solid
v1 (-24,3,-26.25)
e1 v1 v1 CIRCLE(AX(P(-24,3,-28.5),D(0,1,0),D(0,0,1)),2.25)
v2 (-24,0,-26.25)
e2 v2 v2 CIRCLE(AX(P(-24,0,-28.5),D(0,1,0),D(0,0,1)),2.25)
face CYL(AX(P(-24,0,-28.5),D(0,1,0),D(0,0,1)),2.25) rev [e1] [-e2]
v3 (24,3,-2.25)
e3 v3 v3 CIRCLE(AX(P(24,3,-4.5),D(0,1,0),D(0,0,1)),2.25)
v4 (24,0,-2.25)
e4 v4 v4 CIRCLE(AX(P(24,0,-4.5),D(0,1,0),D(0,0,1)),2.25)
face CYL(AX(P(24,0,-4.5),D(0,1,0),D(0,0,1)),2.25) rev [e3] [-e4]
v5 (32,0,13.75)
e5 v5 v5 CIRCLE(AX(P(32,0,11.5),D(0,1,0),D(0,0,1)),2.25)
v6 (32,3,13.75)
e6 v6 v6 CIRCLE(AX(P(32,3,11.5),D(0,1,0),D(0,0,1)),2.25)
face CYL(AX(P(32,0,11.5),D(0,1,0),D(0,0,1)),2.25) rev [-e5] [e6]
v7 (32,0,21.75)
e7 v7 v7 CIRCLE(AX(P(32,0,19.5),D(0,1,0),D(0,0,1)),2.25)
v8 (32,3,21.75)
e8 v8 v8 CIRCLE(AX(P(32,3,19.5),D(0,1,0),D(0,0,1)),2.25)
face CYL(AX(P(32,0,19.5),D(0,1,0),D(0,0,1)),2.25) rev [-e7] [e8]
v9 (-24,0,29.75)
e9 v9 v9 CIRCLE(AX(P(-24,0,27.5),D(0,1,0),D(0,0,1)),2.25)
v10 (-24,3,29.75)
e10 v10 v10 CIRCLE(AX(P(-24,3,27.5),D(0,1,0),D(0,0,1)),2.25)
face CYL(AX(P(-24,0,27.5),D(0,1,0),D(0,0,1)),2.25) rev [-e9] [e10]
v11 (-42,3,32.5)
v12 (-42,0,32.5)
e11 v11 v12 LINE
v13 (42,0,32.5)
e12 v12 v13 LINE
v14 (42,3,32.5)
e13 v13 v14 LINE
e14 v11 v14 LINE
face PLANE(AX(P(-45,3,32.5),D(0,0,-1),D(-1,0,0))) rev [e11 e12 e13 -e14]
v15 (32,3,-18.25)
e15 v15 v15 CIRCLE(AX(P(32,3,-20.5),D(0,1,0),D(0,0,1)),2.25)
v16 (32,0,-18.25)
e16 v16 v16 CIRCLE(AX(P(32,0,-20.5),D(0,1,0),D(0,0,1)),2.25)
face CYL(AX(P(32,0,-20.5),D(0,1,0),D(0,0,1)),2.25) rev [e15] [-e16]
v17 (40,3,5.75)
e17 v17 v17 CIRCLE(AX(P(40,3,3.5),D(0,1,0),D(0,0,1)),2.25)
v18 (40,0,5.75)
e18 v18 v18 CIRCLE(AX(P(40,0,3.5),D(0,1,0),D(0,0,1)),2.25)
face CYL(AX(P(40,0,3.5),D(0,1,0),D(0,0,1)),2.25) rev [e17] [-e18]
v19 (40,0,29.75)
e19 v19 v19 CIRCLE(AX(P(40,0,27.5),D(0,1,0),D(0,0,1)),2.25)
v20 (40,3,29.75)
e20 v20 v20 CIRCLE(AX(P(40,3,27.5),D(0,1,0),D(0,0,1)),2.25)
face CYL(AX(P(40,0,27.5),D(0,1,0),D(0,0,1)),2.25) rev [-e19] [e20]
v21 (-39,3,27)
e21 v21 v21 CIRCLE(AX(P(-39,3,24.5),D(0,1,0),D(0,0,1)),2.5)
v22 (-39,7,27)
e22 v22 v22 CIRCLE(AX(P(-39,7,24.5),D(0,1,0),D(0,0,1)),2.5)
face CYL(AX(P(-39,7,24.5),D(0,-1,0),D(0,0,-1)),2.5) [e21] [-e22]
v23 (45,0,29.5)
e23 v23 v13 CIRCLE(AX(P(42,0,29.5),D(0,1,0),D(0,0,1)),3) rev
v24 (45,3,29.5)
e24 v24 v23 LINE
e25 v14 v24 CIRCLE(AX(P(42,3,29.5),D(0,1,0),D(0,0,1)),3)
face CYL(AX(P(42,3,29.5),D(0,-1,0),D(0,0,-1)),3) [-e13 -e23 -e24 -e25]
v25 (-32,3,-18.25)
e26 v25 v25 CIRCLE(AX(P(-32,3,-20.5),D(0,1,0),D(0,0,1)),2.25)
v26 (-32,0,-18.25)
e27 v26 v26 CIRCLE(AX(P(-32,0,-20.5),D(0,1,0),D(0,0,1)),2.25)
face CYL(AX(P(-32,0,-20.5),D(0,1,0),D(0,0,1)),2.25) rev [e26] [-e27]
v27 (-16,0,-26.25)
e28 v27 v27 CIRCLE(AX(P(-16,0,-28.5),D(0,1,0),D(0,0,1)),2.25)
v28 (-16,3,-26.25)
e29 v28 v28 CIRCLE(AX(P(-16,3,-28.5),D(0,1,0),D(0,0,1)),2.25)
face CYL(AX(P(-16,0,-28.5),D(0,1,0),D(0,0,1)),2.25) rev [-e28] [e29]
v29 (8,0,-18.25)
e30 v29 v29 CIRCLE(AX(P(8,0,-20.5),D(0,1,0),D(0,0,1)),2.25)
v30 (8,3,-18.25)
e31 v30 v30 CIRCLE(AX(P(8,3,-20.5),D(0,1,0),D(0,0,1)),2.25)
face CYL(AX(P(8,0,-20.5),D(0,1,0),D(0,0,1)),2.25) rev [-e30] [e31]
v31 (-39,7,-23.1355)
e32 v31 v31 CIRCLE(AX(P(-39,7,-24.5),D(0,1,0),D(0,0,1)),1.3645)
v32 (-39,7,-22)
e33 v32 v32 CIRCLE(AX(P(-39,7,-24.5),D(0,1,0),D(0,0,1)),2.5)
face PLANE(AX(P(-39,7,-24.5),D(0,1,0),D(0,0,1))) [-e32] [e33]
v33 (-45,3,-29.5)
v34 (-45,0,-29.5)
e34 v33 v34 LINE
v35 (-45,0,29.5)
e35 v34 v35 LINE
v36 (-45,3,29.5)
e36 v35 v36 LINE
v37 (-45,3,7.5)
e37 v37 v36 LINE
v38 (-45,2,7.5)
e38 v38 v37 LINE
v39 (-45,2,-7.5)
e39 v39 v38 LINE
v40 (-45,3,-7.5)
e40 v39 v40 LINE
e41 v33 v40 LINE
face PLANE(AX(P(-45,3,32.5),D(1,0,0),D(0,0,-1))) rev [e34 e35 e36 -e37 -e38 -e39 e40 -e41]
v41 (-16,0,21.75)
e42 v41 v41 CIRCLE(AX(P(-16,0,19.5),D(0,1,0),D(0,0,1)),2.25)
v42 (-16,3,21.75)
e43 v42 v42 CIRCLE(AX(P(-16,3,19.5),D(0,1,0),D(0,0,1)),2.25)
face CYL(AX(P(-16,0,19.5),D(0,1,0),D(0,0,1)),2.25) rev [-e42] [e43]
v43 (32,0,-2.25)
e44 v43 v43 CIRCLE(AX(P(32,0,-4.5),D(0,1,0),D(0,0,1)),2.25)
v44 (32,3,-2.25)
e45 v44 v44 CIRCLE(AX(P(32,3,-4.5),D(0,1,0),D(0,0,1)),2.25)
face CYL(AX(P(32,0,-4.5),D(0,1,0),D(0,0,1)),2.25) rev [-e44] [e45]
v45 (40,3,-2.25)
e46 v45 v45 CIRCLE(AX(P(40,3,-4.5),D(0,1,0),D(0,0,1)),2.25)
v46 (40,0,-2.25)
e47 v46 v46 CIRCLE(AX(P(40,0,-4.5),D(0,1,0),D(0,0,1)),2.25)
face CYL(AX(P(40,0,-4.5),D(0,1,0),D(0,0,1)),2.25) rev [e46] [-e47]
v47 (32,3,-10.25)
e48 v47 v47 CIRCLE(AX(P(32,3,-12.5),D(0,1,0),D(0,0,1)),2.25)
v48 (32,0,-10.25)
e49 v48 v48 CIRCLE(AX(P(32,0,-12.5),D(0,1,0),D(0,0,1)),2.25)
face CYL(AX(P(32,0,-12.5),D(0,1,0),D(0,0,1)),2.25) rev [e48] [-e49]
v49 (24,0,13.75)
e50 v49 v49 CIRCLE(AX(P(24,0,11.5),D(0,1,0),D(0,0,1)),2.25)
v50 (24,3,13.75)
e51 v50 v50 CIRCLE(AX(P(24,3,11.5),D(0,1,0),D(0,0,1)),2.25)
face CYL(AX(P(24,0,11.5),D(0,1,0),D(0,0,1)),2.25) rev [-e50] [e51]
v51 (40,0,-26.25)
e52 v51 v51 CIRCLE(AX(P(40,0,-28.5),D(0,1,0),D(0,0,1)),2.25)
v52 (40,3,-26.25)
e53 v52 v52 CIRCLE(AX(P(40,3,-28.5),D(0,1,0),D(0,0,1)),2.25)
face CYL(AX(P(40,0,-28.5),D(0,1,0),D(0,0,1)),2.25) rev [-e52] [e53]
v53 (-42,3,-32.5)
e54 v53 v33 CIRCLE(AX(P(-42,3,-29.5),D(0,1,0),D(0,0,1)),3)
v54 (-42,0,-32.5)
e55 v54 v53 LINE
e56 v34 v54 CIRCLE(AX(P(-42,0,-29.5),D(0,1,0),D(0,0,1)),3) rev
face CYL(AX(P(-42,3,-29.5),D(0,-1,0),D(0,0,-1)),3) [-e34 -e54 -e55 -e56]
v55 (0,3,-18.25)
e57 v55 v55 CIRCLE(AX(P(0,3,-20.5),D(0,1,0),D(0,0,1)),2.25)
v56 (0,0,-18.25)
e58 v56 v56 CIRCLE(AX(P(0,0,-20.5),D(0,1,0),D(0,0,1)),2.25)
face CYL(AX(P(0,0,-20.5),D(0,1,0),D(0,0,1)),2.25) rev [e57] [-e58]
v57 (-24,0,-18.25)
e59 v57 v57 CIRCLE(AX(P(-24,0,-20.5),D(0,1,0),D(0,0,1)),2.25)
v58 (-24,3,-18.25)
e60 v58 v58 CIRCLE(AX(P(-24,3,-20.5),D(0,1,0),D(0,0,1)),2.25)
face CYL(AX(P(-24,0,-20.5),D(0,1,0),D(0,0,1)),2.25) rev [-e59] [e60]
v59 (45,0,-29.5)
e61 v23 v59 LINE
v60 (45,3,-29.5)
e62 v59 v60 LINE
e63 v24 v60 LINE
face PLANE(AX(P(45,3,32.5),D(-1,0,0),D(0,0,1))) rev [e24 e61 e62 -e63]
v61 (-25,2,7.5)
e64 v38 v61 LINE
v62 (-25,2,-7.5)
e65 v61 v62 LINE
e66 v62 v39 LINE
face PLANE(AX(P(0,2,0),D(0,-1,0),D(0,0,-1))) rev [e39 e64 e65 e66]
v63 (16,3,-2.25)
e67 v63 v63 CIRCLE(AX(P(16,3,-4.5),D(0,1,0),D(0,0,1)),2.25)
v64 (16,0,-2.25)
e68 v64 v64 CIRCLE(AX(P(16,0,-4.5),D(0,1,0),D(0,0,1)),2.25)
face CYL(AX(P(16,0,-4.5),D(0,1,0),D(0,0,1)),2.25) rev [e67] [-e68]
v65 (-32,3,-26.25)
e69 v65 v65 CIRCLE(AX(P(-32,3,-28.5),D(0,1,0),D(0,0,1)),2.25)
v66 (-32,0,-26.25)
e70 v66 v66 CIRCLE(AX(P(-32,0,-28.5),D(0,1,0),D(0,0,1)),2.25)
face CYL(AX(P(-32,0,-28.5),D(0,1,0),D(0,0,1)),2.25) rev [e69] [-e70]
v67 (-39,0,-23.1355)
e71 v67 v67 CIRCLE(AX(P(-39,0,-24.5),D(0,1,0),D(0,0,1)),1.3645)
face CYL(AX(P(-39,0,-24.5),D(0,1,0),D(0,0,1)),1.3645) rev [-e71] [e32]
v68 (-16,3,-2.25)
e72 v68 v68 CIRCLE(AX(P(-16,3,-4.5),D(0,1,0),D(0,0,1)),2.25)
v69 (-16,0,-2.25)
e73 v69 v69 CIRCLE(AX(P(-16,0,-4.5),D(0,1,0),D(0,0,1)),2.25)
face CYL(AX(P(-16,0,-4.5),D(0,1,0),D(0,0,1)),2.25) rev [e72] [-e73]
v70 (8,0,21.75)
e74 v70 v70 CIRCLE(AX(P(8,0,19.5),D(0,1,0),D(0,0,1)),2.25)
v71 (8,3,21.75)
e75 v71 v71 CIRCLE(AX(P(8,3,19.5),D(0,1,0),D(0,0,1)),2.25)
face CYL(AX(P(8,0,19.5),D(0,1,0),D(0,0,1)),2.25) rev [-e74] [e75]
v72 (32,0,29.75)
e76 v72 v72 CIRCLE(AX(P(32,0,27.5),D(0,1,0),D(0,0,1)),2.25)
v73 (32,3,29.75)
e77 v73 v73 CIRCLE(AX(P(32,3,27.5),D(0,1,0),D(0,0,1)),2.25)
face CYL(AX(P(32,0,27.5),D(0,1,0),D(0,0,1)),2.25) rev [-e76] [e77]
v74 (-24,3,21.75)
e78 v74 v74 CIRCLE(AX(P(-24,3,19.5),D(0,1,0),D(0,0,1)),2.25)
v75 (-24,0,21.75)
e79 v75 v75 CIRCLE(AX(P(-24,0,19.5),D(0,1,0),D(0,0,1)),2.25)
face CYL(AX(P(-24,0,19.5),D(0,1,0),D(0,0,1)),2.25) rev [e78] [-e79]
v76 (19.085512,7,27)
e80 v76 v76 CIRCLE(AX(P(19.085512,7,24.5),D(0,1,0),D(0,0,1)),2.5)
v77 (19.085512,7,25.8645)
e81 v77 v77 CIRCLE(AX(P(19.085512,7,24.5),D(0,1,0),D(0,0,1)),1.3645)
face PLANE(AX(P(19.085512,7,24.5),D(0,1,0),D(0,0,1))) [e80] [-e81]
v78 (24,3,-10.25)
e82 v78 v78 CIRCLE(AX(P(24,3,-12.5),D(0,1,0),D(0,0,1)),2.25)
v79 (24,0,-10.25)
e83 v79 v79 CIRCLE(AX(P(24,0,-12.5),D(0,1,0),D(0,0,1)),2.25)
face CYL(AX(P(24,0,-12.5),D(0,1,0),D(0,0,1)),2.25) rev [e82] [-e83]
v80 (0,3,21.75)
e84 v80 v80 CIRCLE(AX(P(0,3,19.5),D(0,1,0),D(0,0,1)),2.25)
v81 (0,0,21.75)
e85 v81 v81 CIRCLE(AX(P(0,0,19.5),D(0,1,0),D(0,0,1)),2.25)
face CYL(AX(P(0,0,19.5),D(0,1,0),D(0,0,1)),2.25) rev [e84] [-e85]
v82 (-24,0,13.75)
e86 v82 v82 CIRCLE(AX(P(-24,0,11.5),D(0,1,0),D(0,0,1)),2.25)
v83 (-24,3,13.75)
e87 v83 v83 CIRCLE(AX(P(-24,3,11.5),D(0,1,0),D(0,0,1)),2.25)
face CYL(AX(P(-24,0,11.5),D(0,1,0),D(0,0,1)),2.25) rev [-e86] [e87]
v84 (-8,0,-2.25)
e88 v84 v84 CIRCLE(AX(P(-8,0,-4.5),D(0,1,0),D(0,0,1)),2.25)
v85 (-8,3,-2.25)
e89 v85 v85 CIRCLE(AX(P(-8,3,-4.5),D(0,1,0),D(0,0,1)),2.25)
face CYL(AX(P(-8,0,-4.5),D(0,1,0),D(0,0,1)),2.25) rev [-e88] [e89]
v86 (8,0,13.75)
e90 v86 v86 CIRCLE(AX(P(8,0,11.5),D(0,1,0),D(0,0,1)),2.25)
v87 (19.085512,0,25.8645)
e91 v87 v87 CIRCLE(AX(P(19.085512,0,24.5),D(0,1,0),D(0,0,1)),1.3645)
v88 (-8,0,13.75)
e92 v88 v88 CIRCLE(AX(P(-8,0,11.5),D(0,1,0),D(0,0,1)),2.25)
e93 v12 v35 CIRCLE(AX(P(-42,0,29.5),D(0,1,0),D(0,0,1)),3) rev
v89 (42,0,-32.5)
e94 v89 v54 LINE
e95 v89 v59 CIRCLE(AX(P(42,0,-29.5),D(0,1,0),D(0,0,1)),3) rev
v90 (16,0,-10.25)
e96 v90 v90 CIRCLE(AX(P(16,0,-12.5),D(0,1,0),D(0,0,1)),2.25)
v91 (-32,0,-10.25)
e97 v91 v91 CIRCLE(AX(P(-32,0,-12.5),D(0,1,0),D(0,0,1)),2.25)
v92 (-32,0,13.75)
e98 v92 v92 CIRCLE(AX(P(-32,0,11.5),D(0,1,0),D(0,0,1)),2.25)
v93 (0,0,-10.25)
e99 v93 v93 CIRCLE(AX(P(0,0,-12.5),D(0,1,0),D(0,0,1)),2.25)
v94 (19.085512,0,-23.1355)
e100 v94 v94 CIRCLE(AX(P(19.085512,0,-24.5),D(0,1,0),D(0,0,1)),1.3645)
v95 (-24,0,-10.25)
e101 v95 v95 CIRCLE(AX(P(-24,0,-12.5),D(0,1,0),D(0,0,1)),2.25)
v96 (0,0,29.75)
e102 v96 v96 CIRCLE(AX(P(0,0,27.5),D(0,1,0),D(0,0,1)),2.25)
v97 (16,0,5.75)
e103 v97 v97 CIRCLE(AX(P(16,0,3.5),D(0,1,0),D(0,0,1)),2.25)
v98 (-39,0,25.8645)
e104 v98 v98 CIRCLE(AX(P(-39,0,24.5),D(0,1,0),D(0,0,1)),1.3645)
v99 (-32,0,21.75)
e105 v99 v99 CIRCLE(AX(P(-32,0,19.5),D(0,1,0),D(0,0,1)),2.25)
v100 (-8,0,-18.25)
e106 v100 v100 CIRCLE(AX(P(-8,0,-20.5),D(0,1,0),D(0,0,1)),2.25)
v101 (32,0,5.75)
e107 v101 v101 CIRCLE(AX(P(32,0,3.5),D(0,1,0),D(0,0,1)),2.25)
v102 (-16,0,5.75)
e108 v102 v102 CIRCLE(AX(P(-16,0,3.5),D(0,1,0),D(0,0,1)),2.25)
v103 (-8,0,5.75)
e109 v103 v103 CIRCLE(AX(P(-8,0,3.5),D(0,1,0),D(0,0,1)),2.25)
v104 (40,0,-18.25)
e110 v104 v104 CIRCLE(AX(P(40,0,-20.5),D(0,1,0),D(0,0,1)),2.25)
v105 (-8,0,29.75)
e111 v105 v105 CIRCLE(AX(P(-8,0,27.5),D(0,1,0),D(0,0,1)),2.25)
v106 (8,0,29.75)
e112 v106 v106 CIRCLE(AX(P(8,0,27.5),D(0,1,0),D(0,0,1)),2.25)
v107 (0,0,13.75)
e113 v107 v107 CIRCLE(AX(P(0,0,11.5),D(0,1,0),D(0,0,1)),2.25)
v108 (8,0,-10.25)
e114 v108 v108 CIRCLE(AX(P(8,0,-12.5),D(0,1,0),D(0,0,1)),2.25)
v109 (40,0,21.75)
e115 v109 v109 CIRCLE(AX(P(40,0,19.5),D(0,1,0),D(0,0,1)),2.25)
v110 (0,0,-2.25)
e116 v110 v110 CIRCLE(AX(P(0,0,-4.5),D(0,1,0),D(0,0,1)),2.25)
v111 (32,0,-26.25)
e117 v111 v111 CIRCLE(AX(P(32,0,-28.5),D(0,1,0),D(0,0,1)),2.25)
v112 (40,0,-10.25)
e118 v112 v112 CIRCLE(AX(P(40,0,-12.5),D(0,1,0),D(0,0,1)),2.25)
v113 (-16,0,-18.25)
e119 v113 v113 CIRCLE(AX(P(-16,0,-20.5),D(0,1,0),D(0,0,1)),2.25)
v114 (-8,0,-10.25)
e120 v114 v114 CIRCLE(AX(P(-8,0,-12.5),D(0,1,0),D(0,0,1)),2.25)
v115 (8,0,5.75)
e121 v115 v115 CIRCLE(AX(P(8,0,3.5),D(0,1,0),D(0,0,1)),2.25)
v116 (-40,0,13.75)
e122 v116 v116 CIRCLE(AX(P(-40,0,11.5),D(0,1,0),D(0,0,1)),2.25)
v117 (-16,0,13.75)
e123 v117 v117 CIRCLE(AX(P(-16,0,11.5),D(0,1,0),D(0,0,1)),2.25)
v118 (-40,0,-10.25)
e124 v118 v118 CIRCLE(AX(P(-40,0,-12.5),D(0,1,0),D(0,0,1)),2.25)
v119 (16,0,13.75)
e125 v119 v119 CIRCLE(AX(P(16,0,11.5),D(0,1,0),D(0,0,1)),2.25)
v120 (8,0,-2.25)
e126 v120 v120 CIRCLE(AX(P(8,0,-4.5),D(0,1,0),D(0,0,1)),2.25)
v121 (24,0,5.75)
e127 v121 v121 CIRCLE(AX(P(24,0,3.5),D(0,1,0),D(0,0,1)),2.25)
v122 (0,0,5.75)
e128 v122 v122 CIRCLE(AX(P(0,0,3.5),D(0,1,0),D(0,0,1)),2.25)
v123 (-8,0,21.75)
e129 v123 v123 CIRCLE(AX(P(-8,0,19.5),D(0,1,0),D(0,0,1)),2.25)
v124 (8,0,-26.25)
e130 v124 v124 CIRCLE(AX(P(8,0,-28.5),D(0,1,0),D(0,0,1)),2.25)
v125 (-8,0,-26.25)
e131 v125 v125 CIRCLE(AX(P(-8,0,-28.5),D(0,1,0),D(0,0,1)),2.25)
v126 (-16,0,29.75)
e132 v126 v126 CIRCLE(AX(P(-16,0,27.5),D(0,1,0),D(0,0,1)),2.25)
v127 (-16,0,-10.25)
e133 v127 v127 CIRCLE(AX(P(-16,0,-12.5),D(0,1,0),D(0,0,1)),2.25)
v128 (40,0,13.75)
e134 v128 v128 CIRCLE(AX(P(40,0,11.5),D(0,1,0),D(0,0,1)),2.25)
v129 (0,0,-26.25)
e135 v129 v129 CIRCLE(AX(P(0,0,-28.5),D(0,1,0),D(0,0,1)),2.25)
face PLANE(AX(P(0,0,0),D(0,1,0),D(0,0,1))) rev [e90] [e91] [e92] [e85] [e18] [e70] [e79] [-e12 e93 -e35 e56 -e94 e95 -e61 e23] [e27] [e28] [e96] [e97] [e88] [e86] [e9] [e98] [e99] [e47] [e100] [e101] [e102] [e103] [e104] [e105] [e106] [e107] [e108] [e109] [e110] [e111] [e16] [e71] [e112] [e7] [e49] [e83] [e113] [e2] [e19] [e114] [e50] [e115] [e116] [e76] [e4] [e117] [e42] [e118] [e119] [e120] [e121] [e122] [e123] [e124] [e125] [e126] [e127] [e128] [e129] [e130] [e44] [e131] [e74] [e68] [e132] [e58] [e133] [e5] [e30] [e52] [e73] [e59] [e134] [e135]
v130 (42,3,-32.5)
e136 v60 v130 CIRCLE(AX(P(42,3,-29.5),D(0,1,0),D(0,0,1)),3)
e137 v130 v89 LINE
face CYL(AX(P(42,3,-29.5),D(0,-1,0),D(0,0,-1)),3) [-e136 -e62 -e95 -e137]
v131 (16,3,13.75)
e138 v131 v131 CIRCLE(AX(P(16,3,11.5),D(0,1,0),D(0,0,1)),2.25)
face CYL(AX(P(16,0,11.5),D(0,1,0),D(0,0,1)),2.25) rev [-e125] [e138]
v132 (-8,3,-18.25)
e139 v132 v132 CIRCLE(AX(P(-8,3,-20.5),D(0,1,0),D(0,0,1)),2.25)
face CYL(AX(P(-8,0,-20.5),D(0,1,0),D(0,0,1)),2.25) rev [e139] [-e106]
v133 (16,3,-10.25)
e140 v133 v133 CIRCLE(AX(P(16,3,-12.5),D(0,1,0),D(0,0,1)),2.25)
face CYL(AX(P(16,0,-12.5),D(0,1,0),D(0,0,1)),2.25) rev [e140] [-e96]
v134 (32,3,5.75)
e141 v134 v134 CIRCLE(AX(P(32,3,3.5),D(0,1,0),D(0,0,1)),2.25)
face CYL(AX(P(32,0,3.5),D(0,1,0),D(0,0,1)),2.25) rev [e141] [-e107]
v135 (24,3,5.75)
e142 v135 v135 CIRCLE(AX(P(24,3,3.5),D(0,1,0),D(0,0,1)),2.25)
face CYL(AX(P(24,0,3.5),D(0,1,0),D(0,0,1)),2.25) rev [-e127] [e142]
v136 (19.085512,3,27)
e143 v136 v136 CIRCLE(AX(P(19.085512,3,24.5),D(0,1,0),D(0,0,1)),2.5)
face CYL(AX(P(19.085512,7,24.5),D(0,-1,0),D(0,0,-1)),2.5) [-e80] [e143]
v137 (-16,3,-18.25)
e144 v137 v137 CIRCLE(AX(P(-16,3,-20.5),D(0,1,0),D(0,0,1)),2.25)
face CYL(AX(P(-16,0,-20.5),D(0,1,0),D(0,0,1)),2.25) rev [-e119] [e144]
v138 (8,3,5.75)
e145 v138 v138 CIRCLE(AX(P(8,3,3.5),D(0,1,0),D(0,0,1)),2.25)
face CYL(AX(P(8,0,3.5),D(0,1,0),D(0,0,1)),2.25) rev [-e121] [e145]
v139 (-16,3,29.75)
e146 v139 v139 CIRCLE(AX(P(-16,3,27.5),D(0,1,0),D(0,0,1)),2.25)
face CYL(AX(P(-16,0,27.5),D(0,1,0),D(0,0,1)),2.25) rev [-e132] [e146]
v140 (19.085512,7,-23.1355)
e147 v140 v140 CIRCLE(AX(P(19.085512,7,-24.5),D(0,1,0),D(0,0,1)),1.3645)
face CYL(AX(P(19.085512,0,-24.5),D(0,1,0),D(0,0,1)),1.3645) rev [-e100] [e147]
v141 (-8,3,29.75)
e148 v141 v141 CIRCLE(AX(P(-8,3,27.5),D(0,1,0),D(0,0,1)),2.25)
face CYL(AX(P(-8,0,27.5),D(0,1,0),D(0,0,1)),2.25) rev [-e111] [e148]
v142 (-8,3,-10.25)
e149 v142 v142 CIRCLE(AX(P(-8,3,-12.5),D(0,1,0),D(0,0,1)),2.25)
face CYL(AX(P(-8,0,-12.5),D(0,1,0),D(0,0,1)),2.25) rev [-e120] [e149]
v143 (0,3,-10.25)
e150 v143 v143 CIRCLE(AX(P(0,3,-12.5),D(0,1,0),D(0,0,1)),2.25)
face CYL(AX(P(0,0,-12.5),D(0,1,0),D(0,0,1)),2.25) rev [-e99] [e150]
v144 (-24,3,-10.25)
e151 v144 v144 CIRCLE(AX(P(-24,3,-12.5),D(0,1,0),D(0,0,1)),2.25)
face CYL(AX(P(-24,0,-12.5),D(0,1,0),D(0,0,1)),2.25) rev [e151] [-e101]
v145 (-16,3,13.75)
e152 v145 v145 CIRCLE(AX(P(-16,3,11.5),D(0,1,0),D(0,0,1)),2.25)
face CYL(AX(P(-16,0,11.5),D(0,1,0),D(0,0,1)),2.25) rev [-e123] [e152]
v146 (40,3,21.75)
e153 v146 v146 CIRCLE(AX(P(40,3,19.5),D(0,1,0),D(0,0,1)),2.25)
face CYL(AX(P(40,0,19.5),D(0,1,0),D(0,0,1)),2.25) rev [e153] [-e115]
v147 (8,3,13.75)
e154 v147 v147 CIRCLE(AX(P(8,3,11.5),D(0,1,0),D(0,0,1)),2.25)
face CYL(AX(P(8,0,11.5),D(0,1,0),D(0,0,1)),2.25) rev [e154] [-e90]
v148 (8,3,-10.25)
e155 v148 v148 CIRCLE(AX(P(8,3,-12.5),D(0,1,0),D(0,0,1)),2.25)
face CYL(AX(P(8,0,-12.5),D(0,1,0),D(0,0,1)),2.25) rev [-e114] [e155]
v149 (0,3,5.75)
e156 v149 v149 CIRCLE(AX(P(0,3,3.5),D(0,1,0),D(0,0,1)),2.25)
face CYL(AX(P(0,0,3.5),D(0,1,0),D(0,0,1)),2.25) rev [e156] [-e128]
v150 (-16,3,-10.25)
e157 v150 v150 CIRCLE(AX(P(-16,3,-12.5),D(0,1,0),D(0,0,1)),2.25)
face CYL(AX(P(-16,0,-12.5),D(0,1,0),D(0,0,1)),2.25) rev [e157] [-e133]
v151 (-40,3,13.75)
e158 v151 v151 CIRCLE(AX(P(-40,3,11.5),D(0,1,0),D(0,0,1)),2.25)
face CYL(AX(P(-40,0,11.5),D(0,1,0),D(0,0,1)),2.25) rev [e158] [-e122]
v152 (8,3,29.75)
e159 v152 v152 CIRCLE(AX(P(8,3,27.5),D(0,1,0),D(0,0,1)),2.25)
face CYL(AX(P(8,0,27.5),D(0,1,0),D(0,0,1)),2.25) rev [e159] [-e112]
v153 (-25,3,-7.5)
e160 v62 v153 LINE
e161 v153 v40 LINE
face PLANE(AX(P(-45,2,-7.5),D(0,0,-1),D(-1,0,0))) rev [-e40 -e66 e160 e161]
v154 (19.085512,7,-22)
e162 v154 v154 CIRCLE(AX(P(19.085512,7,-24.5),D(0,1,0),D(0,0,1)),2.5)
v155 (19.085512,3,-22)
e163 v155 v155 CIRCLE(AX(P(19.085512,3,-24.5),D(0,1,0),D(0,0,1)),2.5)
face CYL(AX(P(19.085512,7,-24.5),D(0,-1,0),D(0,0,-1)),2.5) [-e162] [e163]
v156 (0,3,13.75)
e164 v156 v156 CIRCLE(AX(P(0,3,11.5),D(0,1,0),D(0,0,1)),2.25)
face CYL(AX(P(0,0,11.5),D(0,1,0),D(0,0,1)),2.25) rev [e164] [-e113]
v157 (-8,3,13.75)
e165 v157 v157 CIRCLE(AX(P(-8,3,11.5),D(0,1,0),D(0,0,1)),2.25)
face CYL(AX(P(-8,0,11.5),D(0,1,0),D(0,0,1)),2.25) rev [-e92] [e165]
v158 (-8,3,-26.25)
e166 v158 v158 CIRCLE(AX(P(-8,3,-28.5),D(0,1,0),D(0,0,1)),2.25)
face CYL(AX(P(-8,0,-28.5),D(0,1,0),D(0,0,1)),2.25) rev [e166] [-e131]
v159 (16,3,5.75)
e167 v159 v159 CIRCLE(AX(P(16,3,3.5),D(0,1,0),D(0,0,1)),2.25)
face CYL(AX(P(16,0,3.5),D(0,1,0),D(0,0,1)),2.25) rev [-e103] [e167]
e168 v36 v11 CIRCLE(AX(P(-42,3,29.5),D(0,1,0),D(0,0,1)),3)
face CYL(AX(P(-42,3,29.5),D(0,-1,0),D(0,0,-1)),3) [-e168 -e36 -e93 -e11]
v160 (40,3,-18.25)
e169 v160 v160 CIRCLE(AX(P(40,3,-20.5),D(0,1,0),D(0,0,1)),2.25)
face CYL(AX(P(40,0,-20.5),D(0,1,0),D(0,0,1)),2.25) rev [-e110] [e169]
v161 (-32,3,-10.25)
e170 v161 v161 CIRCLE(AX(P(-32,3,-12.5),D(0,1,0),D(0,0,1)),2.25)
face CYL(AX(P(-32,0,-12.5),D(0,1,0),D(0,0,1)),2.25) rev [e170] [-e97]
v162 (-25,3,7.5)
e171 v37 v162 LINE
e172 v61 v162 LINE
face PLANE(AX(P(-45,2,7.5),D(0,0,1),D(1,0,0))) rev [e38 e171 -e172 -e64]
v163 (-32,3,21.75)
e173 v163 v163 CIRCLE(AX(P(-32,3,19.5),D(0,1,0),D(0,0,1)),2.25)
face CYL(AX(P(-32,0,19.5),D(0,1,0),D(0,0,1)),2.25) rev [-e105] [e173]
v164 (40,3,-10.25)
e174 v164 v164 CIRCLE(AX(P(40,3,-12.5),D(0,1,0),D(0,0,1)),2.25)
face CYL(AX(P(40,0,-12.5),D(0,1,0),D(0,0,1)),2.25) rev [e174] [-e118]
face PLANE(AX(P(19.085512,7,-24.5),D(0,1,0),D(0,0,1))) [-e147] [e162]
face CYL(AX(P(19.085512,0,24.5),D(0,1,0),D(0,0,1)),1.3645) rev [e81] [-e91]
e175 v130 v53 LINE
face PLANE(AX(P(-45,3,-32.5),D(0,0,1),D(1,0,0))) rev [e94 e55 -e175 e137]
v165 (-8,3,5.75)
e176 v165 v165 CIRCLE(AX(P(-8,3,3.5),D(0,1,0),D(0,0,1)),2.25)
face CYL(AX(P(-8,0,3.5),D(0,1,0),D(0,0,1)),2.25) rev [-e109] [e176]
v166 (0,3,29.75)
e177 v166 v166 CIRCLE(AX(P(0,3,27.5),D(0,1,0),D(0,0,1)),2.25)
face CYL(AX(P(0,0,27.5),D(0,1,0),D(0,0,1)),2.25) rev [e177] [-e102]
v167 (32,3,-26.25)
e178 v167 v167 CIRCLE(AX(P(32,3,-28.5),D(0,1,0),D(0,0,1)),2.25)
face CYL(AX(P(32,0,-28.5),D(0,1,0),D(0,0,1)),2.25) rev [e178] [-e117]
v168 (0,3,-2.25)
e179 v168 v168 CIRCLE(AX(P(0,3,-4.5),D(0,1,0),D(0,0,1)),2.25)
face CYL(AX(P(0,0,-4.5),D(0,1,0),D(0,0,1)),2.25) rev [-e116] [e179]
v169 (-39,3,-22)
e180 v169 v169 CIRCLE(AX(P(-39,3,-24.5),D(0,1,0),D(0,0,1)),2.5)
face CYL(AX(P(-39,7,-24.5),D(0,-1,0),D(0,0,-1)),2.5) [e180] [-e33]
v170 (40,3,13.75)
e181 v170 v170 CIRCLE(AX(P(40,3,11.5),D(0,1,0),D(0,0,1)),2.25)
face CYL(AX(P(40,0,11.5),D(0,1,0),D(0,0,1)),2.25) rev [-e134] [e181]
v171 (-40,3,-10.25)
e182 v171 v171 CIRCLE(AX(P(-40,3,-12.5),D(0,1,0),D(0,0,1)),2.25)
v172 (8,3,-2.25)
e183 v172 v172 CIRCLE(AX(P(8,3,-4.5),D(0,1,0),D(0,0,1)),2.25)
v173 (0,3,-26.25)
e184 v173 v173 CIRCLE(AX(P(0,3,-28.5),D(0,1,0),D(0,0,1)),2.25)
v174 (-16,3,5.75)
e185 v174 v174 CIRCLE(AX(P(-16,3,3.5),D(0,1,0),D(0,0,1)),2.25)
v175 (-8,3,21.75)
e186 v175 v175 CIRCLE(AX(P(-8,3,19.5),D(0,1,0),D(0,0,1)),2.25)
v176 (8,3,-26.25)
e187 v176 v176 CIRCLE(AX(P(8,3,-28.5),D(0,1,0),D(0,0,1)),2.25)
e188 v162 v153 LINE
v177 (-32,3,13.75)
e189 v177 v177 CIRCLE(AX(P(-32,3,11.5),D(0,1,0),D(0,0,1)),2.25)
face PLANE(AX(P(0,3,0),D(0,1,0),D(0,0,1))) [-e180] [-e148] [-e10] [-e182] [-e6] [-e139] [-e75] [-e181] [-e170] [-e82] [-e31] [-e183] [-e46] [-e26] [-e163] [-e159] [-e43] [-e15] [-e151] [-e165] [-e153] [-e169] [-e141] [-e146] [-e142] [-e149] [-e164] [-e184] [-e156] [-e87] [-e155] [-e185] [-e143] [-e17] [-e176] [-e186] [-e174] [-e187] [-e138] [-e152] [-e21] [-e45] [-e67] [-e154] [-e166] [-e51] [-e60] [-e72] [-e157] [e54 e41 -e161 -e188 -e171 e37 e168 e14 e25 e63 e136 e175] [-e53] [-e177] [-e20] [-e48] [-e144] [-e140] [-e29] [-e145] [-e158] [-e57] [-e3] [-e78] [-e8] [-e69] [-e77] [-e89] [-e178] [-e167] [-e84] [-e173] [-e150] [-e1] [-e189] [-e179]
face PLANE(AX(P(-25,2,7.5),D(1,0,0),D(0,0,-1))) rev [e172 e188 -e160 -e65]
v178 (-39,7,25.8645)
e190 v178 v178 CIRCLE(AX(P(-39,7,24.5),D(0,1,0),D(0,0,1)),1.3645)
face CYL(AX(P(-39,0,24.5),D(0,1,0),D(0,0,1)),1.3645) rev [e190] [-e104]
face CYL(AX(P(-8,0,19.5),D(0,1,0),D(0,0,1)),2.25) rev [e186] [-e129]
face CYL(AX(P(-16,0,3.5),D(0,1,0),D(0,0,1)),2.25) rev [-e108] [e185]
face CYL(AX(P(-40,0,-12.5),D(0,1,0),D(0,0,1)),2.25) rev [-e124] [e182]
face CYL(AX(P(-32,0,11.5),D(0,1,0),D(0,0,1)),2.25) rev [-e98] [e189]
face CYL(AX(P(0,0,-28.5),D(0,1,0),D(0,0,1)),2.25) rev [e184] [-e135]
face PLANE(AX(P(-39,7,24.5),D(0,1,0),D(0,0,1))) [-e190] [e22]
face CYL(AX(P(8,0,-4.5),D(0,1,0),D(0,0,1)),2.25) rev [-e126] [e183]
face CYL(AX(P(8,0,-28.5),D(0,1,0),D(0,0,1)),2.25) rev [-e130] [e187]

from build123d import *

# Parameters (mm, degrees)
SKIZZE1_W                       = 90
SKIZZE1_H                       = 65
AUFSATZ_LINEAR_AUSTRAGEN1_DEPTH = 3
SKIZZE2_W                       = 20
SKIZZE2_H                       = 15
SCHNITT_LINEAR_AUSTRAGEN1_DEPTH = 1
SKIZZE3_R                       = 2.5
AUFSATZ_LINEAR_AUSTRAGEN2_DEPTH = 4
SKIZZE4_R                       = 1.364499713
SCHNITT_LINEAR_AUSTRAGEN2_DEPTH = 56.948637159
VERRUNDUNG1_R                   = 3
SKIZZE5_R                       = 2.25
SCHNITT_LINEAR_AUSTRAGEN3_DEPTH = 56.65294242
F_LLMUSTER1_OUTLINE_R           = 2.25
F_LLMUSTER1_DEPTH               = 3


# Read off the part's stored shape, not the designer's step: Füllmuster1
with BuildPart() as part:
    # Skizze1 → Aufsatz-Linear austragen1 (new body)
    with BuildSketch(Plane(origin=(0, 0, 0), x_dir=(1, 0, 0), z_dir=(0, 1, 0))):
        Rectangle(SKIZZE1_W, SKIZZE1_H)
    extrude(amount=AUFSATZ_LINEAR_AUSTRAGEN1_DEPTH)

    # Skizze2 → Schnitt-Linear austragen1 (cut)
    with BuildSketch(Plane(origin=(0, 3, 0), x_dir=(1, 0, 0), z_dir=(0, 1, 0))):
        with Locations((-35, 0)):
            Rectangle(SKIZZE2_W, SKIZZE2_H)
    extrude(amount=-SCHNITT_LINEAR_AUSTRAGEN1_DEPTH, mode=Mode.SUBTRACT)

    # Skizze3 → Aufsatz-Linear austragen2 (add)
    with BuildSketch(Plane(origin=(0, 3, 0), x_dir=(1, 0, 0), z_dir=(0, 1, 0))):
        with Locations(Location((-39, 24.5, 0), (0, 0, 270))):
            Circle(SKIZZE3_R)
        with Locations(Location((19.085512482, 24.5, 0), (0, 0, 270))):
            Circle(SKIZZE3_R)
        with Locations(Location((19.085512482, -24.5, 0), (0, 0, 270))):
            Circle(SKIZZE3_R)
        with Locations(Location((-39, -24.5, 0), (0, 0, 270))):
            Circle(SKIZZE3_R)
    extrude(amount=AUFSATZ_LINEAR_AUSTRAGEN2_DEPTH)

    # Skizze4 → Schnitt-Linear austragen2 (cut, through all)
    with BuildSketch(Plane(origin=(0, 7, 0), x_dir=(1, 0, 0), z_dir=(0, 1, 0))):
        with Locations(Location((19.085512482, 24.5, 0), (0, 0, 270))):
            Circle(SKIZZE4_R)
        with Locations(Location((-39, 24.5, 0), (0, 0, 270))):
            Circle(SKIZZE4_R)
        with Locations(Location((-39, -24.5, 0), (0, 0, 270))):
            Circle(SKIZZE4_R)
        with Locations(Location((19.085512482, -24.5, 0), (0, 0, 270))):
            Circle(SKIZZE4_R)
    extrude(amount=-SCHNITT_LINEAR_AUSTRAGEN2_DEPTH, mode=Mode.SUBTRACT)

    # Verrundung1
    verrundung1_edges = [part.edges().sort_by_distance(p)[0] for p in [
        (-45, 1.5, 32.5),
        (-45, 1.5, -32.5),
        (45, 1.5, -32.5),
        (45, 1.5, 32.5),
    ]]
    fillet(verrundung1_edges, radius=VERRUNDUNG1_R)

    # Skizze5 → Schnitt-Linear austragen3 (cut, through all)
    with BuildSketch(Plane(origin=(0, 3, 0), x_dir=(1, 0, 0), z_dir=(0, 1, 0))):
        with Locations(Location((-32, 28.5, 0), (0, 0, 270))):
            Circle(SKIZZE5_R)
    extrude(amount=-SCHNITT_LINEAR_AUSTRAGEN3_DEPTH, mode=Mode.SUBTRACT)

    # Füllmuster1 outline → Füllmuster1 (cut)
    with BuildSketch(Plane(origin=(0, 0, 0), x_dir=(1, 0, 0), z_dir=(0, 1, 0))):
        with Locations((40, 28.5)):
            Circle(F_LLMUSTER1_OUTLINE_R)
        with Locations((-32, -19.5)):
            Circle(F_LLMUSTER1_OUTLINE_R)
        with Locations((-40, 12.5)):
            Circle(F_LLMUSTER1_OUTLINE_R)
        with Locations((-40, -11.5)):
            Circle(F_LLMUSTER1_OUTLINE_R)
        with Locations((16, 4.5)):
            Circle(F_LLMUSTER1_OUTLINE_R)
        with Locations((16, -3.5)):
            Circle(F_LLMUSTER1_OUTLINE_R)
        with Locations((16, -11.5)):
            Circle(F_LLMUSTER1_OUTLINE_R)
        with Locations((8, 28.5)):
            Circle(F_LLMUSTER1_OUTLINE_R)
        with Locations((24, 4.5)):
            Circle(F_LLMUSTER1_OUTLINE_R)
        with Locations((24, -3.5)):
            Circle(F_LLMUSTER1_OUTLINE_R)
        with Locations((24, -11.5)):
            Circle(F_LLMUSTER1_OUTLINE_R)
        with Locations((16, 12.5)):
            Circle(F_LLMUSTER1_OUTLINE_R)
        with Locations((8, -11.5)):
            Circle(F_LLMUSTER1_OUTLINE_R)
        with Locations((8, -19.5)):
            Circle(F_LLMUSTER1_OUTLINE_R)
        with Locations((8, -27.5)):
            Circle(F_LLMUSTER1_OUTLINE_R)
        with Locations((0, 28.5)):
            Circle(F_LLMUSTER1_OUTLINE_R)
        with Locations((8, -3.5)):
            Circle(F_LLMUSTER1_OUTLINE_R)
        with Locations((8, 4.5)):
            Circle(F_LLMUSTER1_OUTLINE_R)
        with Locations((8, 12.5)):
            Circle(F_LLMUSTER1_OUTLINE_R)
        with Locations((8, 20.5)):
            Circle(F_LLMUSTER1_OUTLINE_R)
        with Locations((40, -11.5)):
            Circle(F_LLMUSTER1_OUTLINE_R)
        with Locations((40, -19.5)):
            Circle(F_LLMUSTER1_OUTLINE_R)
        with Locations((40, -27.5)):
            Circle(F_LLMUSTER1_OUTLINE_R)
        with Locations((32, 28.5)):
            Circle(F_LLMUSTER1_OUTLINE_R)
        with Locations((40, -3.5)):
            Circle(F_LLMUSTER1_OUTLINE_R)
        with Locations((40, 4.5)):
            Circle(F_LLMUSTER1_OUTLINE_R)
        with Locations((40, 12.5)):
            Circle(F_LLMUSTER1_OUTLINE_R)
        with Locations((40, 20.5)):
            Circle(F_LLMUSTER1_OUTLINE_R)
        with Locations((32, -11.5)):
            Circle(F_LLMUSTER1_OUTLINE_R)
        with Locations((32, -19.5)):
            Circle(F_LLMUSTER1_OUTLINE_R)
        with Locations((32, -27.5)):
            Circle(F_LLMUSTER1_OUTLINE_R)
        with Locations((24, 12.5)):
            Circle(F_LLMUSTER1_OUTLINE_R)
        with Locations((32, -3.5)):
            Circle(F_LLMUSTER1_OUTLINE_R)
        with Locations((32, 4.5)):
            Circle(F_LLMUSTER1_OUTLINE_R)
        with Locations((32, 12.5)):
            Circle(F_LLMUSTER1_OUTLINE_R)
        with Locations((32, 20.5)):
            Circle(F_LLMUSTER1_OUTLINE_R)
        with Locations((-16, -11.5)):
            Circle(F_LLMUSTER1_OUTLINE_R)
        with Locations((-16, -19.5)):
            Circle(F_LLMUSTER1_OUTLINE_R)
        with Locations((-16, -27.5)):
            Circle(F_LLMUSTER1_OUTLINE_R)
        with Locations((-24, 28.5)):
            Circle(F_LLMUSTER1_OUTLINE_R)
        with Locations((-16, -3.5)):
            Circle(F_LLMUSTER1_OUTLINE_R)
        with Locations((-16, 4.5)):
            Circle(F_LLMUSTER1_OUTLINE_R)
        with Locations((-16, 12.5)):
            Circle(F_LLMUSTER1_OUTLINE_R)
        with Locations((-16, 20.5)):
            Circle(F_LLMUSTER1_OUTLINE_R)
        with Locations((-24, -27.5)):
            Circle(F_LLMUSTER1_OUTLINE_R)
        with Locations((-32, 20.5)):
            Circle(F_LLMUSTER1_OUTLINE_R)
        with Locations((-32, 12.5)):
            Circle(F_LLMUSTER1_OUTLINE_R)
        with Locations((-32, -11.5)):
            Circle(F_LLMUSTER1_OUTLINE_R)
        with Locations((-24, -19.5)):
            Circle(F_LLMUSTER1_OUTLINE_R)
        with Locations((-24, -11.5)):
            Circle(F_LLMUSTER1_OUTLINE_R)
        with Locations((-24, 12.5)):
            Circle(F_LLMUSTER1_OUTLINE_R)
        with Locations((-24, 20.5)):
            Circle(F_LLMUSTER1_OUTLINE_R)
        with Locations((0, -11.5)):
            Circle(F_LLMUSTER1_OUTLINE_R)
        with Locations((0, -19.5)):
            Circle(F_LLMUSTER1_OUTLINE_R)
        with Locations((0, -27.5)):
            Circle(F_LLMUSTER1_OUTLINE_R)
        with Locations((-8, 28.5)):
            Circle(F_LLMUSTER1_OUTLINE_R)
        with Locations((0, -3.5)):
            Circle(F_LLMUSTER1_OUTLINE_R)
        with Locations((0, 4.5)):
            Circle(F_LLMUSTER1_OUTLINE_R)
        with Locations((0, 12.5)):
            Circle(F_LLMUSTER1_OUTLINE_R)
        with Locations((0, 20.5)):
            Circle(F_LLMUSTER1_OUTLINE_R)
        with Locations((-8, -11.5)):
            Circle(F_LLMUSTER1_OUTLINE_R)
        with Locations((-8, -19.5)):
            Circle(F_LLMUSTER1_OUTLINE_R)
        with Locations((-8, -27.5)):
            Circle(F_LLMUSTER1_OUTLINE_R)
        with Locations((-16, 28.5)):
            Circle(F_LLMUSTER1_OUTLINE_R)
        with Locations((-8, -3.5)):
            Circle(F_LLMUSTER1_OUTLINE_R)
        with Locations((-8, 4.5)):
            Circle(F_LLMUSTER1_OUTLINE_R)
        with Locations((-8, 12.5)):
            Circle(F_LLMUSTER1_OUTLINE_R)
        with Locations((-8, 20.5)):
            Circle(F_LLMUSTER1_OUTLINE_R)
    extrude(amount=F_LLMUSTER1_DEPTH, mode=Mode.SUBTRACT)


solid = part.part
